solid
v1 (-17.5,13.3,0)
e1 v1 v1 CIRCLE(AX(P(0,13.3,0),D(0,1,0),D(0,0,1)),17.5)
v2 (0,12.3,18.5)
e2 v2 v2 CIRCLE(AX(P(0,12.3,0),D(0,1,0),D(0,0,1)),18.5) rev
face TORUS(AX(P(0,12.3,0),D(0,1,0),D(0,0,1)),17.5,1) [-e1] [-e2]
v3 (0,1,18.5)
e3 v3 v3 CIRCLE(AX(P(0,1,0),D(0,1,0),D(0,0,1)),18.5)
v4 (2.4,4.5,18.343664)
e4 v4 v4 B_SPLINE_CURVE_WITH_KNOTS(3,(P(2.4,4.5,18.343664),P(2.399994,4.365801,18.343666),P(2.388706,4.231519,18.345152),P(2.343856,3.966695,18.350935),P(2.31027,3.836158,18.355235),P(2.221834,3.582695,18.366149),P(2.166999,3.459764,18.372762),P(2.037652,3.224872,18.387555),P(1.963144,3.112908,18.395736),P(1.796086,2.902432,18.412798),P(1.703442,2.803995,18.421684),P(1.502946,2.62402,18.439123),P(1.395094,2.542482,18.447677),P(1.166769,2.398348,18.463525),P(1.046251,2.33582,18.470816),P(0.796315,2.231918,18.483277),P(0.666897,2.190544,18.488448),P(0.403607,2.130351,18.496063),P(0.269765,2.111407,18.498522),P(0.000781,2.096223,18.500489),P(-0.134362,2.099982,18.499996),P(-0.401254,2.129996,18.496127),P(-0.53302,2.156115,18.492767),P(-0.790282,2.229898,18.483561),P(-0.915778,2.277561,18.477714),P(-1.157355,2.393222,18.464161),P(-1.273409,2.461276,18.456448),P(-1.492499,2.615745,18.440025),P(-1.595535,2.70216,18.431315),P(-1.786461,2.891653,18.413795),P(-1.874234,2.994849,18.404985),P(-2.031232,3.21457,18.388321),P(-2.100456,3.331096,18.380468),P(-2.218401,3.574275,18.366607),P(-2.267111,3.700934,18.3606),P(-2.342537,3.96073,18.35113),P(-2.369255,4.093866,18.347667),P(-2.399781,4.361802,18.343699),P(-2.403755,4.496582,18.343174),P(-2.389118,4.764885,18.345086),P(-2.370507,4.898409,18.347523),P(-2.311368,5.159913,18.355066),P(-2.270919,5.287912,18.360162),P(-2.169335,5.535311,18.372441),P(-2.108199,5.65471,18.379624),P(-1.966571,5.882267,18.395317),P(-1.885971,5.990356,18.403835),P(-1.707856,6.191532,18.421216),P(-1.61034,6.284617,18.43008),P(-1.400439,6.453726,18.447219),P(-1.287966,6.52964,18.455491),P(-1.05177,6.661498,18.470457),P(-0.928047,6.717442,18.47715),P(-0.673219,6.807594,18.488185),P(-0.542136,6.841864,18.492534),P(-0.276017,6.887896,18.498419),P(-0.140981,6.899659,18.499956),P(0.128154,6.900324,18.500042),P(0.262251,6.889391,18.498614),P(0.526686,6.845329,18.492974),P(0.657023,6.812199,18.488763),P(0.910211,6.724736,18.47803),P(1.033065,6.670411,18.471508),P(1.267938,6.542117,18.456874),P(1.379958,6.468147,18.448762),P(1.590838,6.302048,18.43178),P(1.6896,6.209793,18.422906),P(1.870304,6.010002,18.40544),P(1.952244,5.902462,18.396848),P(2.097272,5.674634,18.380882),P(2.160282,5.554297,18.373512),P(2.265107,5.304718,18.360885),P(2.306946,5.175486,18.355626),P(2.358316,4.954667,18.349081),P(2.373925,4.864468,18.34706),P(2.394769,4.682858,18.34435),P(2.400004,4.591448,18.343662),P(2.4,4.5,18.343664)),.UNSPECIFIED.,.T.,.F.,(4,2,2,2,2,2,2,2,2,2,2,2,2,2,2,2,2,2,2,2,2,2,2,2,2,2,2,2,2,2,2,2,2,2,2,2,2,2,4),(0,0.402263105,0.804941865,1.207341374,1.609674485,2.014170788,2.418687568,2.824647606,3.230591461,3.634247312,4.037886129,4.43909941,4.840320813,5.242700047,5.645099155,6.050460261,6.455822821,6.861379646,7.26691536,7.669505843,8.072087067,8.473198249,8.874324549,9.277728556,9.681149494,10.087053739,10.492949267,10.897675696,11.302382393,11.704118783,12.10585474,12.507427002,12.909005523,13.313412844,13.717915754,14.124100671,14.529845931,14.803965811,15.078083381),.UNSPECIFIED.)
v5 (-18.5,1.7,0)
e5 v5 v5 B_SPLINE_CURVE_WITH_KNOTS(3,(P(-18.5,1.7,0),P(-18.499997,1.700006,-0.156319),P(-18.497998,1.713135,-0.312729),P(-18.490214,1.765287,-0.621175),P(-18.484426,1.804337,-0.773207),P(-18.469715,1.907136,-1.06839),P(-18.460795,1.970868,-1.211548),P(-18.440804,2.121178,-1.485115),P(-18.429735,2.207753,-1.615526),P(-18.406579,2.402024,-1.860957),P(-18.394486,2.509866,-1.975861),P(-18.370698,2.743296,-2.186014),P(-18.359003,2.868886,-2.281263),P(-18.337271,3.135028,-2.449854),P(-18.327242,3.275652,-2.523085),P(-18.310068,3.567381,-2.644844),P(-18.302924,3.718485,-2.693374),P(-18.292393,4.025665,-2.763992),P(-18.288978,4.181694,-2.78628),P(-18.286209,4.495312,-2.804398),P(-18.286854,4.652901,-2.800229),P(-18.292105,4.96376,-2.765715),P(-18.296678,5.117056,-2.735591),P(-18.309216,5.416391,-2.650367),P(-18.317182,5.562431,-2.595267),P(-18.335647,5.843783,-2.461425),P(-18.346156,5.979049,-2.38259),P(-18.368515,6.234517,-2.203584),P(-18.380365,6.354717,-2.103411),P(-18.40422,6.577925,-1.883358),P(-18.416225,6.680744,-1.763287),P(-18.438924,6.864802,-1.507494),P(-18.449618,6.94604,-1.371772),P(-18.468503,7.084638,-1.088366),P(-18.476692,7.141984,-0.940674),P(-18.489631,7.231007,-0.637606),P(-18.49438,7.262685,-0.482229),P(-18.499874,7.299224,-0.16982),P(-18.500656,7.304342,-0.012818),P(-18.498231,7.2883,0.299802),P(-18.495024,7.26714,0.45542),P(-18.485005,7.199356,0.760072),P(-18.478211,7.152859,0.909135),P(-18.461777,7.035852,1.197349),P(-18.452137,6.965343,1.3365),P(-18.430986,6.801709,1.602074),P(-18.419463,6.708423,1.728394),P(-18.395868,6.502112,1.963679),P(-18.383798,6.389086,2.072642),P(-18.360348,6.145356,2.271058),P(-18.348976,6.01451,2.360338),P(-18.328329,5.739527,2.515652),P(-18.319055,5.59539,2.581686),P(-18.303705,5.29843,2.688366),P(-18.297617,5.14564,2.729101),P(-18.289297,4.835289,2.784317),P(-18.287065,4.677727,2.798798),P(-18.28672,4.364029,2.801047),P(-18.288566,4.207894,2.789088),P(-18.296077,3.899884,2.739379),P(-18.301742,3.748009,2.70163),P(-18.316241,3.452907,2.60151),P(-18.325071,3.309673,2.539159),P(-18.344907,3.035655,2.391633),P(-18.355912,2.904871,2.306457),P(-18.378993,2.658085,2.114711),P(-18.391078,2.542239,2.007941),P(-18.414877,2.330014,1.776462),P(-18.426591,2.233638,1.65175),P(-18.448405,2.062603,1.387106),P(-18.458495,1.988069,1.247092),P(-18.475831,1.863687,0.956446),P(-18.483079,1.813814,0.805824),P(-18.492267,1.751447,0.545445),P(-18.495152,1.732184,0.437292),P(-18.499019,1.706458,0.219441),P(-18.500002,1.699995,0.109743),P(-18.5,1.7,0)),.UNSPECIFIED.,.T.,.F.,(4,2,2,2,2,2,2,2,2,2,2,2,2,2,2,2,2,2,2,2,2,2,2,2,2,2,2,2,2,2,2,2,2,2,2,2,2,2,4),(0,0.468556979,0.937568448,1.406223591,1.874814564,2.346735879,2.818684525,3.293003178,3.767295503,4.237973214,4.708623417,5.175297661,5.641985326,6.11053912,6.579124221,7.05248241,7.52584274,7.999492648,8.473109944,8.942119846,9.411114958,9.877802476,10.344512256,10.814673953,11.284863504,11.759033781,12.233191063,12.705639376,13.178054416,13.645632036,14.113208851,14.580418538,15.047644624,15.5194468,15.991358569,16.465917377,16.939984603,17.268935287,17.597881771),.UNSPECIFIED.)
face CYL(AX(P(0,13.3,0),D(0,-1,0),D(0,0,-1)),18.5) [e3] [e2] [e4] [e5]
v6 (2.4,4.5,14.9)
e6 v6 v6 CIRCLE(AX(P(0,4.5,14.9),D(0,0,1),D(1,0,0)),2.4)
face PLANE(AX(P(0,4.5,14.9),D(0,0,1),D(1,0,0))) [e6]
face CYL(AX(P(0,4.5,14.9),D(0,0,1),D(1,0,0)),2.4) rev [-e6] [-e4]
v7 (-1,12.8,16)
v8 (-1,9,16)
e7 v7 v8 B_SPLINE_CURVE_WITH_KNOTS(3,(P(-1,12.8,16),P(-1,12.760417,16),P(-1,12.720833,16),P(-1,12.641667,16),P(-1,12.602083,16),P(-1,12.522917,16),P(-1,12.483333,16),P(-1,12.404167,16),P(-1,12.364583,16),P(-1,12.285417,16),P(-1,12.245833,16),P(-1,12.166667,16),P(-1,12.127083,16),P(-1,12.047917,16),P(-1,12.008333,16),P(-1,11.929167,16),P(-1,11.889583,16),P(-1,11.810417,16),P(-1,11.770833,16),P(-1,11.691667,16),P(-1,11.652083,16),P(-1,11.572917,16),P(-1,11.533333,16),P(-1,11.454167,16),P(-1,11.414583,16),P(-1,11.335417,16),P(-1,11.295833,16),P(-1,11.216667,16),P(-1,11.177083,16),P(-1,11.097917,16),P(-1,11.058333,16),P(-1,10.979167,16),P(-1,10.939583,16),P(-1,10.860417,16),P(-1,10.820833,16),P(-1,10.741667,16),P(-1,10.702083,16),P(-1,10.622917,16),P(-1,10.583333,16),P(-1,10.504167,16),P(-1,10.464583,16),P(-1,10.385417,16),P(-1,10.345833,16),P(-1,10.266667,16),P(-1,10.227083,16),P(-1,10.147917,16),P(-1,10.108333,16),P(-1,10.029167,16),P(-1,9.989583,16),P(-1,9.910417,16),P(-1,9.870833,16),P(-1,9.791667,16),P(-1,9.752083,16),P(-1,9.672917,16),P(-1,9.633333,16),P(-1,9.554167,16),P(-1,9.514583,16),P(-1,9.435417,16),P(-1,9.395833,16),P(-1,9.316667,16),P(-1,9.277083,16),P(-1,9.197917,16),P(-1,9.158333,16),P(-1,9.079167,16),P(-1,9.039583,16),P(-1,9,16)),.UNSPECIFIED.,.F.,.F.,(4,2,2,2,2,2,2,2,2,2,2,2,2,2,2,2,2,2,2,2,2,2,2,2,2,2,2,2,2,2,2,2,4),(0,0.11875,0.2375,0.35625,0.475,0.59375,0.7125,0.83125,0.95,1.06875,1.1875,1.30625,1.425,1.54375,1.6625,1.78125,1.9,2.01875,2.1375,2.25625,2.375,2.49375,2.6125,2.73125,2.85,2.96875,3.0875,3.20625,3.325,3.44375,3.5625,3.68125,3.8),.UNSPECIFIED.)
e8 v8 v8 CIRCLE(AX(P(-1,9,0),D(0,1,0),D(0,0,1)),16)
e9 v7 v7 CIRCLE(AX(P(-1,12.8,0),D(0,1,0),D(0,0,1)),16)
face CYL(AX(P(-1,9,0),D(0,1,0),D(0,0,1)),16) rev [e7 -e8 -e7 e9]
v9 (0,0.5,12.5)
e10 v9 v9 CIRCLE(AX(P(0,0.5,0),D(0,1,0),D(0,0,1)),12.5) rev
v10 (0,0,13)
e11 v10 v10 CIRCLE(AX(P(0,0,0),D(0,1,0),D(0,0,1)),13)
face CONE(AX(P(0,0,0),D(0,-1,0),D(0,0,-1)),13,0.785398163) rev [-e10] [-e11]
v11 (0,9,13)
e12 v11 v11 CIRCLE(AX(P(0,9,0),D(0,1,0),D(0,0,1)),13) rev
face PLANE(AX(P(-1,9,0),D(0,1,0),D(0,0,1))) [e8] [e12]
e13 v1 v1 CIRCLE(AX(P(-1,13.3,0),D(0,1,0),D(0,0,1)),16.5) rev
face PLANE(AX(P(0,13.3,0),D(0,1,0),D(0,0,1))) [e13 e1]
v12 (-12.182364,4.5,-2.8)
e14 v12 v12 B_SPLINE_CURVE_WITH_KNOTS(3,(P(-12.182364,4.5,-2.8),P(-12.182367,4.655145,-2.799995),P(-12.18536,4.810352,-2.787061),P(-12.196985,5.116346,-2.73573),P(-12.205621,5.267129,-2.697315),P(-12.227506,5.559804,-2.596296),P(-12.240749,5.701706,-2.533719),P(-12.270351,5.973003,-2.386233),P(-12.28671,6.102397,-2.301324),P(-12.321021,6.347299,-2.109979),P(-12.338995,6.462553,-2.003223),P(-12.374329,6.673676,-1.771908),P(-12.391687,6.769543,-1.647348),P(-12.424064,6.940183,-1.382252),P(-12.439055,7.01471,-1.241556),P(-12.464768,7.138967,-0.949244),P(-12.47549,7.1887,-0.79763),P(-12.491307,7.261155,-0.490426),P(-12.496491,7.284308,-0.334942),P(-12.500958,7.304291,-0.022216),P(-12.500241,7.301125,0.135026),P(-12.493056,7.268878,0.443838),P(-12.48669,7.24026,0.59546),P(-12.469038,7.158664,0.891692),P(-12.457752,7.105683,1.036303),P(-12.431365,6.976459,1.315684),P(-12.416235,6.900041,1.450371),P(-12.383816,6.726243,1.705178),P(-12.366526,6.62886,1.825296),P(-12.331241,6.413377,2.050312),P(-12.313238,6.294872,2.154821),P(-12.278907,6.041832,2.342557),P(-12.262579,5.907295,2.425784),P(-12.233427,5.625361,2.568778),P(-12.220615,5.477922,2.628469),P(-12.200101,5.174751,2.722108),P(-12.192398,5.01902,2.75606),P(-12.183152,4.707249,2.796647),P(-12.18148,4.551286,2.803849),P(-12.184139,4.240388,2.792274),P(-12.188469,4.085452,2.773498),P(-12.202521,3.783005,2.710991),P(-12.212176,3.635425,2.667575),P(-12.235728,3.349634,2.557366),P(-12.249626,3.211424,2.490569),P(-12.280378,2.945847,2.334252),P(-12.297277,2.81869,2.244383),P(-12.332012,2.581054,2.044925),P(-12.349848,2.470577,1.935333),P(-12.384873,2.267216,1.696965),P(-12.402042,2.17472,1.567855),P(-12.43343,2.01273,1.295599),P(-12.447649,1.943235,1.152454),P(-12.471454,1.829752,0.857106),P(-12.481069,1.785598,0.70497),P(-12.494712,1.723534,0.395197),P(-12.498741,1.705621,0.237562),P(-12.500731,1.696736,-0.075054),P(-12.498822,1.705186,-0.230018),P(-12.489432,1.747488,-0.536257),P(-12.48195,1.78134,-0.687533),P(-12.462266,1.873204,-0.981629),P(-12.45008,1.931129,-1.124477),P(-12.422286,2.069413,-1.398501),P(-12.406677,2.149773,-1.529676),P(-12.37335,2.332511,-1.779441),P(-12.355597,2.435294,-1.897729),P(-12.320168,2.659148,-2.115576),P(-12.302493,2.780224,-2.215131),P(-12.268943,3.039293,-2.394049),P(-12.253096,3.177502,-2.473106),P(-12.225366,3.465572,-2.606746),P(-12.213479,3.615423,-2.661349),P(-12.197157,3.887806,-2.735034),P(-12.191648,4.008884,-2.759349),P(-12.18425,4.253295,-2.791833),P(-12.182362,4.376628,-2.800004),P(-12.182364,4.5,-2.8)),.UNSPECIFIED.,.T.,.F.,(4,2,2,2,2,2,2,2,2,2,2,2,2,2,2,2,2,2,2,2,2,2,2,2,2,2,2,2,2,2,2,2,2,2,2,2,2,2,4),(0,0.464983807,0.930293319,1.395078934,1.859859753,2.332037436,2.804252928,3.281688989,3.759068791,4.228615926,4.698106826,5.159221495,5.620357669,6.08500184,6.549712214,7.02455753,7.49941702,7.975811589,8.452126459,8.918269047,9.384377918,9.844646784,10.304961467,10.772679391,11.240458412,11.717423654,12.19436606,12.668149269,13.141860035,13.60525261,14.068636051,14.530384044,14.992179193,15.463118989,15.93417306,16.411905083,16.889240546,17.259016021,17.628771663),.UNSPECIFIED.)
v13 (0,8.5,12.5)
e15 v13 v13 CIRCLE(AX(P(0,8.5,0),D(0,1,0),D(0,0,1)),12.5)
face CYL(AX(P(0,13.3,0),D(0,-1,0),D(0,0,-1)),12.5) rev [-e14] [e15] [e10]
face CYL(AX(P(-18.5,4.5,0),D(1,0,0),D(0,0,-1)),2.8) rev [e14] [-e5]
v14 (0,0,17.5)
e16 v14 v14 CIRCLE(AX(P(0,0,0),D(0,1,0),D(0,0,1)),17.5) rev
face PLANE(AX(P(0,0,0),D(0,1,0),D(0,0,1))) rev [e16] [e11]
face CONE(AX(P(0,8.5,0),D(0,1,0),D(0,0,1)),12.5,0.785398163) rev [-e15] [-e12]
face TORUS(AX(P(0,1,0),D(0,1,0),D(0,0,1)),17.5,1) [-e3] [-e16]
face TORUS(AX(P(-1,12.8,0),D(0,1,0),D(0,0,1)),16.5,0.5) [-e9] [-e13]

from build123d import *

# Parameters (mm, degrees)
SKETCH_1_R          = 18.5
SKETCH_1_R_2        = 12.5
EXTRUDE_1_DEPTH     = 13.3
SKETCH_2_R          = 16
CUT_EXTRUDE_1_DEPTH = 4.3
SKETCH_3_R          = 2.8
CUT_EXTRUDE_2_DEPTH = 30.349446332
FILLET_1_R          = 1
FILLET_2_R          = 0.5
CHAMFER_1_SIZE      = 0.5
SKETCH_4_R          = 2.4
CUT_EXTRUDE_3_DEPTH = 3.6


with BuildPart() as part:
    # Эскиз1 → Бобышка-Вытянуть1 (new body)
    with BuildSketch(Plane(origin=(0, 0, 0), x_dir=(1, 0, 0), z_dir=(0, 1, 0))):
        with Locations(Location((0, 0, 0), (0, 0, 270))):
            Circle(SKETCH_1_R)
        with Locations(Location((0, 0, 0), (0, 0, 270))):
            Circle(SKETCH_1_R_2, mode=Mode.SUBTRACT)
    extrude(amount=EXTRUDE_1_DEPTH)

    # Эскиз2 → Вырез-Вытянуть1 (cut)
    with BuildSketch(Plane(origin=(0, 13.3, 0), x_dir=(1, 0, 0), z_dir=(0, 1, 0))):
        with Locations(Location((-1, 0, 0), (0, 0, 270))):
            Circle(SKETCH_2_R)
    extrude(amount=-CUT_EXTRUDE_1_DEPTH, mode=Mode.SUBTRACT)

    # Эскиз3 → Вырез-Вытянуть2 (cut, through all)
    with BuildSketch(Plane(origin=(0, 0, 0), x_dir=(0, 0, -1), z_dir=(1, 0, 0))):
        with Locations((0, 4.5)):
            Circle(SKETCH_3_R)
    extrude(amount=-CUT_EXTRUDE_2_DEPTH, mode=Mode.SUBTRACT)

    # Скругление1
    fillet_1_edges = [part.edges().sort_by_distance(p)[0] for p in [
        (0, 0, -18.5),
        (0, 13.3, -18.5),
    ]]
    fillet(fillet_1_edges, radius=FILLET_1_R)

    # Скругление2
    fillet_2_edges = [part.edges().sort_by_distance(p)[0] for p in [
        (-1, 13.3, -16),
    ]]
    fillet(fillet_2_edges, radius=FILLET_2_R - 0.0001)  # a hair under: the kernel refuses the full size

    # Фаска1
    chamfer_1_edges = [part.edges().sort_by_distance(p)[0] for p in [
        (0, 9, -12.5),
        (0, 0, -12.5),
    ]]
    chamfer(chamfer_1_edges, length=CHAMFER_1_SIZE)

    # Эскиз4 → Вырез-Вытянуть3 (cut)
    with BuildSketch(Plane.XY.offset(18.5)):
        with Locations((0, 4.5)):
            Circle(SKETCH_4_R)
    extrude(amount=-CUT_EXTRUDE_3_DEPTH, mode=Mode.SUBTRACT)


solid = part.part
